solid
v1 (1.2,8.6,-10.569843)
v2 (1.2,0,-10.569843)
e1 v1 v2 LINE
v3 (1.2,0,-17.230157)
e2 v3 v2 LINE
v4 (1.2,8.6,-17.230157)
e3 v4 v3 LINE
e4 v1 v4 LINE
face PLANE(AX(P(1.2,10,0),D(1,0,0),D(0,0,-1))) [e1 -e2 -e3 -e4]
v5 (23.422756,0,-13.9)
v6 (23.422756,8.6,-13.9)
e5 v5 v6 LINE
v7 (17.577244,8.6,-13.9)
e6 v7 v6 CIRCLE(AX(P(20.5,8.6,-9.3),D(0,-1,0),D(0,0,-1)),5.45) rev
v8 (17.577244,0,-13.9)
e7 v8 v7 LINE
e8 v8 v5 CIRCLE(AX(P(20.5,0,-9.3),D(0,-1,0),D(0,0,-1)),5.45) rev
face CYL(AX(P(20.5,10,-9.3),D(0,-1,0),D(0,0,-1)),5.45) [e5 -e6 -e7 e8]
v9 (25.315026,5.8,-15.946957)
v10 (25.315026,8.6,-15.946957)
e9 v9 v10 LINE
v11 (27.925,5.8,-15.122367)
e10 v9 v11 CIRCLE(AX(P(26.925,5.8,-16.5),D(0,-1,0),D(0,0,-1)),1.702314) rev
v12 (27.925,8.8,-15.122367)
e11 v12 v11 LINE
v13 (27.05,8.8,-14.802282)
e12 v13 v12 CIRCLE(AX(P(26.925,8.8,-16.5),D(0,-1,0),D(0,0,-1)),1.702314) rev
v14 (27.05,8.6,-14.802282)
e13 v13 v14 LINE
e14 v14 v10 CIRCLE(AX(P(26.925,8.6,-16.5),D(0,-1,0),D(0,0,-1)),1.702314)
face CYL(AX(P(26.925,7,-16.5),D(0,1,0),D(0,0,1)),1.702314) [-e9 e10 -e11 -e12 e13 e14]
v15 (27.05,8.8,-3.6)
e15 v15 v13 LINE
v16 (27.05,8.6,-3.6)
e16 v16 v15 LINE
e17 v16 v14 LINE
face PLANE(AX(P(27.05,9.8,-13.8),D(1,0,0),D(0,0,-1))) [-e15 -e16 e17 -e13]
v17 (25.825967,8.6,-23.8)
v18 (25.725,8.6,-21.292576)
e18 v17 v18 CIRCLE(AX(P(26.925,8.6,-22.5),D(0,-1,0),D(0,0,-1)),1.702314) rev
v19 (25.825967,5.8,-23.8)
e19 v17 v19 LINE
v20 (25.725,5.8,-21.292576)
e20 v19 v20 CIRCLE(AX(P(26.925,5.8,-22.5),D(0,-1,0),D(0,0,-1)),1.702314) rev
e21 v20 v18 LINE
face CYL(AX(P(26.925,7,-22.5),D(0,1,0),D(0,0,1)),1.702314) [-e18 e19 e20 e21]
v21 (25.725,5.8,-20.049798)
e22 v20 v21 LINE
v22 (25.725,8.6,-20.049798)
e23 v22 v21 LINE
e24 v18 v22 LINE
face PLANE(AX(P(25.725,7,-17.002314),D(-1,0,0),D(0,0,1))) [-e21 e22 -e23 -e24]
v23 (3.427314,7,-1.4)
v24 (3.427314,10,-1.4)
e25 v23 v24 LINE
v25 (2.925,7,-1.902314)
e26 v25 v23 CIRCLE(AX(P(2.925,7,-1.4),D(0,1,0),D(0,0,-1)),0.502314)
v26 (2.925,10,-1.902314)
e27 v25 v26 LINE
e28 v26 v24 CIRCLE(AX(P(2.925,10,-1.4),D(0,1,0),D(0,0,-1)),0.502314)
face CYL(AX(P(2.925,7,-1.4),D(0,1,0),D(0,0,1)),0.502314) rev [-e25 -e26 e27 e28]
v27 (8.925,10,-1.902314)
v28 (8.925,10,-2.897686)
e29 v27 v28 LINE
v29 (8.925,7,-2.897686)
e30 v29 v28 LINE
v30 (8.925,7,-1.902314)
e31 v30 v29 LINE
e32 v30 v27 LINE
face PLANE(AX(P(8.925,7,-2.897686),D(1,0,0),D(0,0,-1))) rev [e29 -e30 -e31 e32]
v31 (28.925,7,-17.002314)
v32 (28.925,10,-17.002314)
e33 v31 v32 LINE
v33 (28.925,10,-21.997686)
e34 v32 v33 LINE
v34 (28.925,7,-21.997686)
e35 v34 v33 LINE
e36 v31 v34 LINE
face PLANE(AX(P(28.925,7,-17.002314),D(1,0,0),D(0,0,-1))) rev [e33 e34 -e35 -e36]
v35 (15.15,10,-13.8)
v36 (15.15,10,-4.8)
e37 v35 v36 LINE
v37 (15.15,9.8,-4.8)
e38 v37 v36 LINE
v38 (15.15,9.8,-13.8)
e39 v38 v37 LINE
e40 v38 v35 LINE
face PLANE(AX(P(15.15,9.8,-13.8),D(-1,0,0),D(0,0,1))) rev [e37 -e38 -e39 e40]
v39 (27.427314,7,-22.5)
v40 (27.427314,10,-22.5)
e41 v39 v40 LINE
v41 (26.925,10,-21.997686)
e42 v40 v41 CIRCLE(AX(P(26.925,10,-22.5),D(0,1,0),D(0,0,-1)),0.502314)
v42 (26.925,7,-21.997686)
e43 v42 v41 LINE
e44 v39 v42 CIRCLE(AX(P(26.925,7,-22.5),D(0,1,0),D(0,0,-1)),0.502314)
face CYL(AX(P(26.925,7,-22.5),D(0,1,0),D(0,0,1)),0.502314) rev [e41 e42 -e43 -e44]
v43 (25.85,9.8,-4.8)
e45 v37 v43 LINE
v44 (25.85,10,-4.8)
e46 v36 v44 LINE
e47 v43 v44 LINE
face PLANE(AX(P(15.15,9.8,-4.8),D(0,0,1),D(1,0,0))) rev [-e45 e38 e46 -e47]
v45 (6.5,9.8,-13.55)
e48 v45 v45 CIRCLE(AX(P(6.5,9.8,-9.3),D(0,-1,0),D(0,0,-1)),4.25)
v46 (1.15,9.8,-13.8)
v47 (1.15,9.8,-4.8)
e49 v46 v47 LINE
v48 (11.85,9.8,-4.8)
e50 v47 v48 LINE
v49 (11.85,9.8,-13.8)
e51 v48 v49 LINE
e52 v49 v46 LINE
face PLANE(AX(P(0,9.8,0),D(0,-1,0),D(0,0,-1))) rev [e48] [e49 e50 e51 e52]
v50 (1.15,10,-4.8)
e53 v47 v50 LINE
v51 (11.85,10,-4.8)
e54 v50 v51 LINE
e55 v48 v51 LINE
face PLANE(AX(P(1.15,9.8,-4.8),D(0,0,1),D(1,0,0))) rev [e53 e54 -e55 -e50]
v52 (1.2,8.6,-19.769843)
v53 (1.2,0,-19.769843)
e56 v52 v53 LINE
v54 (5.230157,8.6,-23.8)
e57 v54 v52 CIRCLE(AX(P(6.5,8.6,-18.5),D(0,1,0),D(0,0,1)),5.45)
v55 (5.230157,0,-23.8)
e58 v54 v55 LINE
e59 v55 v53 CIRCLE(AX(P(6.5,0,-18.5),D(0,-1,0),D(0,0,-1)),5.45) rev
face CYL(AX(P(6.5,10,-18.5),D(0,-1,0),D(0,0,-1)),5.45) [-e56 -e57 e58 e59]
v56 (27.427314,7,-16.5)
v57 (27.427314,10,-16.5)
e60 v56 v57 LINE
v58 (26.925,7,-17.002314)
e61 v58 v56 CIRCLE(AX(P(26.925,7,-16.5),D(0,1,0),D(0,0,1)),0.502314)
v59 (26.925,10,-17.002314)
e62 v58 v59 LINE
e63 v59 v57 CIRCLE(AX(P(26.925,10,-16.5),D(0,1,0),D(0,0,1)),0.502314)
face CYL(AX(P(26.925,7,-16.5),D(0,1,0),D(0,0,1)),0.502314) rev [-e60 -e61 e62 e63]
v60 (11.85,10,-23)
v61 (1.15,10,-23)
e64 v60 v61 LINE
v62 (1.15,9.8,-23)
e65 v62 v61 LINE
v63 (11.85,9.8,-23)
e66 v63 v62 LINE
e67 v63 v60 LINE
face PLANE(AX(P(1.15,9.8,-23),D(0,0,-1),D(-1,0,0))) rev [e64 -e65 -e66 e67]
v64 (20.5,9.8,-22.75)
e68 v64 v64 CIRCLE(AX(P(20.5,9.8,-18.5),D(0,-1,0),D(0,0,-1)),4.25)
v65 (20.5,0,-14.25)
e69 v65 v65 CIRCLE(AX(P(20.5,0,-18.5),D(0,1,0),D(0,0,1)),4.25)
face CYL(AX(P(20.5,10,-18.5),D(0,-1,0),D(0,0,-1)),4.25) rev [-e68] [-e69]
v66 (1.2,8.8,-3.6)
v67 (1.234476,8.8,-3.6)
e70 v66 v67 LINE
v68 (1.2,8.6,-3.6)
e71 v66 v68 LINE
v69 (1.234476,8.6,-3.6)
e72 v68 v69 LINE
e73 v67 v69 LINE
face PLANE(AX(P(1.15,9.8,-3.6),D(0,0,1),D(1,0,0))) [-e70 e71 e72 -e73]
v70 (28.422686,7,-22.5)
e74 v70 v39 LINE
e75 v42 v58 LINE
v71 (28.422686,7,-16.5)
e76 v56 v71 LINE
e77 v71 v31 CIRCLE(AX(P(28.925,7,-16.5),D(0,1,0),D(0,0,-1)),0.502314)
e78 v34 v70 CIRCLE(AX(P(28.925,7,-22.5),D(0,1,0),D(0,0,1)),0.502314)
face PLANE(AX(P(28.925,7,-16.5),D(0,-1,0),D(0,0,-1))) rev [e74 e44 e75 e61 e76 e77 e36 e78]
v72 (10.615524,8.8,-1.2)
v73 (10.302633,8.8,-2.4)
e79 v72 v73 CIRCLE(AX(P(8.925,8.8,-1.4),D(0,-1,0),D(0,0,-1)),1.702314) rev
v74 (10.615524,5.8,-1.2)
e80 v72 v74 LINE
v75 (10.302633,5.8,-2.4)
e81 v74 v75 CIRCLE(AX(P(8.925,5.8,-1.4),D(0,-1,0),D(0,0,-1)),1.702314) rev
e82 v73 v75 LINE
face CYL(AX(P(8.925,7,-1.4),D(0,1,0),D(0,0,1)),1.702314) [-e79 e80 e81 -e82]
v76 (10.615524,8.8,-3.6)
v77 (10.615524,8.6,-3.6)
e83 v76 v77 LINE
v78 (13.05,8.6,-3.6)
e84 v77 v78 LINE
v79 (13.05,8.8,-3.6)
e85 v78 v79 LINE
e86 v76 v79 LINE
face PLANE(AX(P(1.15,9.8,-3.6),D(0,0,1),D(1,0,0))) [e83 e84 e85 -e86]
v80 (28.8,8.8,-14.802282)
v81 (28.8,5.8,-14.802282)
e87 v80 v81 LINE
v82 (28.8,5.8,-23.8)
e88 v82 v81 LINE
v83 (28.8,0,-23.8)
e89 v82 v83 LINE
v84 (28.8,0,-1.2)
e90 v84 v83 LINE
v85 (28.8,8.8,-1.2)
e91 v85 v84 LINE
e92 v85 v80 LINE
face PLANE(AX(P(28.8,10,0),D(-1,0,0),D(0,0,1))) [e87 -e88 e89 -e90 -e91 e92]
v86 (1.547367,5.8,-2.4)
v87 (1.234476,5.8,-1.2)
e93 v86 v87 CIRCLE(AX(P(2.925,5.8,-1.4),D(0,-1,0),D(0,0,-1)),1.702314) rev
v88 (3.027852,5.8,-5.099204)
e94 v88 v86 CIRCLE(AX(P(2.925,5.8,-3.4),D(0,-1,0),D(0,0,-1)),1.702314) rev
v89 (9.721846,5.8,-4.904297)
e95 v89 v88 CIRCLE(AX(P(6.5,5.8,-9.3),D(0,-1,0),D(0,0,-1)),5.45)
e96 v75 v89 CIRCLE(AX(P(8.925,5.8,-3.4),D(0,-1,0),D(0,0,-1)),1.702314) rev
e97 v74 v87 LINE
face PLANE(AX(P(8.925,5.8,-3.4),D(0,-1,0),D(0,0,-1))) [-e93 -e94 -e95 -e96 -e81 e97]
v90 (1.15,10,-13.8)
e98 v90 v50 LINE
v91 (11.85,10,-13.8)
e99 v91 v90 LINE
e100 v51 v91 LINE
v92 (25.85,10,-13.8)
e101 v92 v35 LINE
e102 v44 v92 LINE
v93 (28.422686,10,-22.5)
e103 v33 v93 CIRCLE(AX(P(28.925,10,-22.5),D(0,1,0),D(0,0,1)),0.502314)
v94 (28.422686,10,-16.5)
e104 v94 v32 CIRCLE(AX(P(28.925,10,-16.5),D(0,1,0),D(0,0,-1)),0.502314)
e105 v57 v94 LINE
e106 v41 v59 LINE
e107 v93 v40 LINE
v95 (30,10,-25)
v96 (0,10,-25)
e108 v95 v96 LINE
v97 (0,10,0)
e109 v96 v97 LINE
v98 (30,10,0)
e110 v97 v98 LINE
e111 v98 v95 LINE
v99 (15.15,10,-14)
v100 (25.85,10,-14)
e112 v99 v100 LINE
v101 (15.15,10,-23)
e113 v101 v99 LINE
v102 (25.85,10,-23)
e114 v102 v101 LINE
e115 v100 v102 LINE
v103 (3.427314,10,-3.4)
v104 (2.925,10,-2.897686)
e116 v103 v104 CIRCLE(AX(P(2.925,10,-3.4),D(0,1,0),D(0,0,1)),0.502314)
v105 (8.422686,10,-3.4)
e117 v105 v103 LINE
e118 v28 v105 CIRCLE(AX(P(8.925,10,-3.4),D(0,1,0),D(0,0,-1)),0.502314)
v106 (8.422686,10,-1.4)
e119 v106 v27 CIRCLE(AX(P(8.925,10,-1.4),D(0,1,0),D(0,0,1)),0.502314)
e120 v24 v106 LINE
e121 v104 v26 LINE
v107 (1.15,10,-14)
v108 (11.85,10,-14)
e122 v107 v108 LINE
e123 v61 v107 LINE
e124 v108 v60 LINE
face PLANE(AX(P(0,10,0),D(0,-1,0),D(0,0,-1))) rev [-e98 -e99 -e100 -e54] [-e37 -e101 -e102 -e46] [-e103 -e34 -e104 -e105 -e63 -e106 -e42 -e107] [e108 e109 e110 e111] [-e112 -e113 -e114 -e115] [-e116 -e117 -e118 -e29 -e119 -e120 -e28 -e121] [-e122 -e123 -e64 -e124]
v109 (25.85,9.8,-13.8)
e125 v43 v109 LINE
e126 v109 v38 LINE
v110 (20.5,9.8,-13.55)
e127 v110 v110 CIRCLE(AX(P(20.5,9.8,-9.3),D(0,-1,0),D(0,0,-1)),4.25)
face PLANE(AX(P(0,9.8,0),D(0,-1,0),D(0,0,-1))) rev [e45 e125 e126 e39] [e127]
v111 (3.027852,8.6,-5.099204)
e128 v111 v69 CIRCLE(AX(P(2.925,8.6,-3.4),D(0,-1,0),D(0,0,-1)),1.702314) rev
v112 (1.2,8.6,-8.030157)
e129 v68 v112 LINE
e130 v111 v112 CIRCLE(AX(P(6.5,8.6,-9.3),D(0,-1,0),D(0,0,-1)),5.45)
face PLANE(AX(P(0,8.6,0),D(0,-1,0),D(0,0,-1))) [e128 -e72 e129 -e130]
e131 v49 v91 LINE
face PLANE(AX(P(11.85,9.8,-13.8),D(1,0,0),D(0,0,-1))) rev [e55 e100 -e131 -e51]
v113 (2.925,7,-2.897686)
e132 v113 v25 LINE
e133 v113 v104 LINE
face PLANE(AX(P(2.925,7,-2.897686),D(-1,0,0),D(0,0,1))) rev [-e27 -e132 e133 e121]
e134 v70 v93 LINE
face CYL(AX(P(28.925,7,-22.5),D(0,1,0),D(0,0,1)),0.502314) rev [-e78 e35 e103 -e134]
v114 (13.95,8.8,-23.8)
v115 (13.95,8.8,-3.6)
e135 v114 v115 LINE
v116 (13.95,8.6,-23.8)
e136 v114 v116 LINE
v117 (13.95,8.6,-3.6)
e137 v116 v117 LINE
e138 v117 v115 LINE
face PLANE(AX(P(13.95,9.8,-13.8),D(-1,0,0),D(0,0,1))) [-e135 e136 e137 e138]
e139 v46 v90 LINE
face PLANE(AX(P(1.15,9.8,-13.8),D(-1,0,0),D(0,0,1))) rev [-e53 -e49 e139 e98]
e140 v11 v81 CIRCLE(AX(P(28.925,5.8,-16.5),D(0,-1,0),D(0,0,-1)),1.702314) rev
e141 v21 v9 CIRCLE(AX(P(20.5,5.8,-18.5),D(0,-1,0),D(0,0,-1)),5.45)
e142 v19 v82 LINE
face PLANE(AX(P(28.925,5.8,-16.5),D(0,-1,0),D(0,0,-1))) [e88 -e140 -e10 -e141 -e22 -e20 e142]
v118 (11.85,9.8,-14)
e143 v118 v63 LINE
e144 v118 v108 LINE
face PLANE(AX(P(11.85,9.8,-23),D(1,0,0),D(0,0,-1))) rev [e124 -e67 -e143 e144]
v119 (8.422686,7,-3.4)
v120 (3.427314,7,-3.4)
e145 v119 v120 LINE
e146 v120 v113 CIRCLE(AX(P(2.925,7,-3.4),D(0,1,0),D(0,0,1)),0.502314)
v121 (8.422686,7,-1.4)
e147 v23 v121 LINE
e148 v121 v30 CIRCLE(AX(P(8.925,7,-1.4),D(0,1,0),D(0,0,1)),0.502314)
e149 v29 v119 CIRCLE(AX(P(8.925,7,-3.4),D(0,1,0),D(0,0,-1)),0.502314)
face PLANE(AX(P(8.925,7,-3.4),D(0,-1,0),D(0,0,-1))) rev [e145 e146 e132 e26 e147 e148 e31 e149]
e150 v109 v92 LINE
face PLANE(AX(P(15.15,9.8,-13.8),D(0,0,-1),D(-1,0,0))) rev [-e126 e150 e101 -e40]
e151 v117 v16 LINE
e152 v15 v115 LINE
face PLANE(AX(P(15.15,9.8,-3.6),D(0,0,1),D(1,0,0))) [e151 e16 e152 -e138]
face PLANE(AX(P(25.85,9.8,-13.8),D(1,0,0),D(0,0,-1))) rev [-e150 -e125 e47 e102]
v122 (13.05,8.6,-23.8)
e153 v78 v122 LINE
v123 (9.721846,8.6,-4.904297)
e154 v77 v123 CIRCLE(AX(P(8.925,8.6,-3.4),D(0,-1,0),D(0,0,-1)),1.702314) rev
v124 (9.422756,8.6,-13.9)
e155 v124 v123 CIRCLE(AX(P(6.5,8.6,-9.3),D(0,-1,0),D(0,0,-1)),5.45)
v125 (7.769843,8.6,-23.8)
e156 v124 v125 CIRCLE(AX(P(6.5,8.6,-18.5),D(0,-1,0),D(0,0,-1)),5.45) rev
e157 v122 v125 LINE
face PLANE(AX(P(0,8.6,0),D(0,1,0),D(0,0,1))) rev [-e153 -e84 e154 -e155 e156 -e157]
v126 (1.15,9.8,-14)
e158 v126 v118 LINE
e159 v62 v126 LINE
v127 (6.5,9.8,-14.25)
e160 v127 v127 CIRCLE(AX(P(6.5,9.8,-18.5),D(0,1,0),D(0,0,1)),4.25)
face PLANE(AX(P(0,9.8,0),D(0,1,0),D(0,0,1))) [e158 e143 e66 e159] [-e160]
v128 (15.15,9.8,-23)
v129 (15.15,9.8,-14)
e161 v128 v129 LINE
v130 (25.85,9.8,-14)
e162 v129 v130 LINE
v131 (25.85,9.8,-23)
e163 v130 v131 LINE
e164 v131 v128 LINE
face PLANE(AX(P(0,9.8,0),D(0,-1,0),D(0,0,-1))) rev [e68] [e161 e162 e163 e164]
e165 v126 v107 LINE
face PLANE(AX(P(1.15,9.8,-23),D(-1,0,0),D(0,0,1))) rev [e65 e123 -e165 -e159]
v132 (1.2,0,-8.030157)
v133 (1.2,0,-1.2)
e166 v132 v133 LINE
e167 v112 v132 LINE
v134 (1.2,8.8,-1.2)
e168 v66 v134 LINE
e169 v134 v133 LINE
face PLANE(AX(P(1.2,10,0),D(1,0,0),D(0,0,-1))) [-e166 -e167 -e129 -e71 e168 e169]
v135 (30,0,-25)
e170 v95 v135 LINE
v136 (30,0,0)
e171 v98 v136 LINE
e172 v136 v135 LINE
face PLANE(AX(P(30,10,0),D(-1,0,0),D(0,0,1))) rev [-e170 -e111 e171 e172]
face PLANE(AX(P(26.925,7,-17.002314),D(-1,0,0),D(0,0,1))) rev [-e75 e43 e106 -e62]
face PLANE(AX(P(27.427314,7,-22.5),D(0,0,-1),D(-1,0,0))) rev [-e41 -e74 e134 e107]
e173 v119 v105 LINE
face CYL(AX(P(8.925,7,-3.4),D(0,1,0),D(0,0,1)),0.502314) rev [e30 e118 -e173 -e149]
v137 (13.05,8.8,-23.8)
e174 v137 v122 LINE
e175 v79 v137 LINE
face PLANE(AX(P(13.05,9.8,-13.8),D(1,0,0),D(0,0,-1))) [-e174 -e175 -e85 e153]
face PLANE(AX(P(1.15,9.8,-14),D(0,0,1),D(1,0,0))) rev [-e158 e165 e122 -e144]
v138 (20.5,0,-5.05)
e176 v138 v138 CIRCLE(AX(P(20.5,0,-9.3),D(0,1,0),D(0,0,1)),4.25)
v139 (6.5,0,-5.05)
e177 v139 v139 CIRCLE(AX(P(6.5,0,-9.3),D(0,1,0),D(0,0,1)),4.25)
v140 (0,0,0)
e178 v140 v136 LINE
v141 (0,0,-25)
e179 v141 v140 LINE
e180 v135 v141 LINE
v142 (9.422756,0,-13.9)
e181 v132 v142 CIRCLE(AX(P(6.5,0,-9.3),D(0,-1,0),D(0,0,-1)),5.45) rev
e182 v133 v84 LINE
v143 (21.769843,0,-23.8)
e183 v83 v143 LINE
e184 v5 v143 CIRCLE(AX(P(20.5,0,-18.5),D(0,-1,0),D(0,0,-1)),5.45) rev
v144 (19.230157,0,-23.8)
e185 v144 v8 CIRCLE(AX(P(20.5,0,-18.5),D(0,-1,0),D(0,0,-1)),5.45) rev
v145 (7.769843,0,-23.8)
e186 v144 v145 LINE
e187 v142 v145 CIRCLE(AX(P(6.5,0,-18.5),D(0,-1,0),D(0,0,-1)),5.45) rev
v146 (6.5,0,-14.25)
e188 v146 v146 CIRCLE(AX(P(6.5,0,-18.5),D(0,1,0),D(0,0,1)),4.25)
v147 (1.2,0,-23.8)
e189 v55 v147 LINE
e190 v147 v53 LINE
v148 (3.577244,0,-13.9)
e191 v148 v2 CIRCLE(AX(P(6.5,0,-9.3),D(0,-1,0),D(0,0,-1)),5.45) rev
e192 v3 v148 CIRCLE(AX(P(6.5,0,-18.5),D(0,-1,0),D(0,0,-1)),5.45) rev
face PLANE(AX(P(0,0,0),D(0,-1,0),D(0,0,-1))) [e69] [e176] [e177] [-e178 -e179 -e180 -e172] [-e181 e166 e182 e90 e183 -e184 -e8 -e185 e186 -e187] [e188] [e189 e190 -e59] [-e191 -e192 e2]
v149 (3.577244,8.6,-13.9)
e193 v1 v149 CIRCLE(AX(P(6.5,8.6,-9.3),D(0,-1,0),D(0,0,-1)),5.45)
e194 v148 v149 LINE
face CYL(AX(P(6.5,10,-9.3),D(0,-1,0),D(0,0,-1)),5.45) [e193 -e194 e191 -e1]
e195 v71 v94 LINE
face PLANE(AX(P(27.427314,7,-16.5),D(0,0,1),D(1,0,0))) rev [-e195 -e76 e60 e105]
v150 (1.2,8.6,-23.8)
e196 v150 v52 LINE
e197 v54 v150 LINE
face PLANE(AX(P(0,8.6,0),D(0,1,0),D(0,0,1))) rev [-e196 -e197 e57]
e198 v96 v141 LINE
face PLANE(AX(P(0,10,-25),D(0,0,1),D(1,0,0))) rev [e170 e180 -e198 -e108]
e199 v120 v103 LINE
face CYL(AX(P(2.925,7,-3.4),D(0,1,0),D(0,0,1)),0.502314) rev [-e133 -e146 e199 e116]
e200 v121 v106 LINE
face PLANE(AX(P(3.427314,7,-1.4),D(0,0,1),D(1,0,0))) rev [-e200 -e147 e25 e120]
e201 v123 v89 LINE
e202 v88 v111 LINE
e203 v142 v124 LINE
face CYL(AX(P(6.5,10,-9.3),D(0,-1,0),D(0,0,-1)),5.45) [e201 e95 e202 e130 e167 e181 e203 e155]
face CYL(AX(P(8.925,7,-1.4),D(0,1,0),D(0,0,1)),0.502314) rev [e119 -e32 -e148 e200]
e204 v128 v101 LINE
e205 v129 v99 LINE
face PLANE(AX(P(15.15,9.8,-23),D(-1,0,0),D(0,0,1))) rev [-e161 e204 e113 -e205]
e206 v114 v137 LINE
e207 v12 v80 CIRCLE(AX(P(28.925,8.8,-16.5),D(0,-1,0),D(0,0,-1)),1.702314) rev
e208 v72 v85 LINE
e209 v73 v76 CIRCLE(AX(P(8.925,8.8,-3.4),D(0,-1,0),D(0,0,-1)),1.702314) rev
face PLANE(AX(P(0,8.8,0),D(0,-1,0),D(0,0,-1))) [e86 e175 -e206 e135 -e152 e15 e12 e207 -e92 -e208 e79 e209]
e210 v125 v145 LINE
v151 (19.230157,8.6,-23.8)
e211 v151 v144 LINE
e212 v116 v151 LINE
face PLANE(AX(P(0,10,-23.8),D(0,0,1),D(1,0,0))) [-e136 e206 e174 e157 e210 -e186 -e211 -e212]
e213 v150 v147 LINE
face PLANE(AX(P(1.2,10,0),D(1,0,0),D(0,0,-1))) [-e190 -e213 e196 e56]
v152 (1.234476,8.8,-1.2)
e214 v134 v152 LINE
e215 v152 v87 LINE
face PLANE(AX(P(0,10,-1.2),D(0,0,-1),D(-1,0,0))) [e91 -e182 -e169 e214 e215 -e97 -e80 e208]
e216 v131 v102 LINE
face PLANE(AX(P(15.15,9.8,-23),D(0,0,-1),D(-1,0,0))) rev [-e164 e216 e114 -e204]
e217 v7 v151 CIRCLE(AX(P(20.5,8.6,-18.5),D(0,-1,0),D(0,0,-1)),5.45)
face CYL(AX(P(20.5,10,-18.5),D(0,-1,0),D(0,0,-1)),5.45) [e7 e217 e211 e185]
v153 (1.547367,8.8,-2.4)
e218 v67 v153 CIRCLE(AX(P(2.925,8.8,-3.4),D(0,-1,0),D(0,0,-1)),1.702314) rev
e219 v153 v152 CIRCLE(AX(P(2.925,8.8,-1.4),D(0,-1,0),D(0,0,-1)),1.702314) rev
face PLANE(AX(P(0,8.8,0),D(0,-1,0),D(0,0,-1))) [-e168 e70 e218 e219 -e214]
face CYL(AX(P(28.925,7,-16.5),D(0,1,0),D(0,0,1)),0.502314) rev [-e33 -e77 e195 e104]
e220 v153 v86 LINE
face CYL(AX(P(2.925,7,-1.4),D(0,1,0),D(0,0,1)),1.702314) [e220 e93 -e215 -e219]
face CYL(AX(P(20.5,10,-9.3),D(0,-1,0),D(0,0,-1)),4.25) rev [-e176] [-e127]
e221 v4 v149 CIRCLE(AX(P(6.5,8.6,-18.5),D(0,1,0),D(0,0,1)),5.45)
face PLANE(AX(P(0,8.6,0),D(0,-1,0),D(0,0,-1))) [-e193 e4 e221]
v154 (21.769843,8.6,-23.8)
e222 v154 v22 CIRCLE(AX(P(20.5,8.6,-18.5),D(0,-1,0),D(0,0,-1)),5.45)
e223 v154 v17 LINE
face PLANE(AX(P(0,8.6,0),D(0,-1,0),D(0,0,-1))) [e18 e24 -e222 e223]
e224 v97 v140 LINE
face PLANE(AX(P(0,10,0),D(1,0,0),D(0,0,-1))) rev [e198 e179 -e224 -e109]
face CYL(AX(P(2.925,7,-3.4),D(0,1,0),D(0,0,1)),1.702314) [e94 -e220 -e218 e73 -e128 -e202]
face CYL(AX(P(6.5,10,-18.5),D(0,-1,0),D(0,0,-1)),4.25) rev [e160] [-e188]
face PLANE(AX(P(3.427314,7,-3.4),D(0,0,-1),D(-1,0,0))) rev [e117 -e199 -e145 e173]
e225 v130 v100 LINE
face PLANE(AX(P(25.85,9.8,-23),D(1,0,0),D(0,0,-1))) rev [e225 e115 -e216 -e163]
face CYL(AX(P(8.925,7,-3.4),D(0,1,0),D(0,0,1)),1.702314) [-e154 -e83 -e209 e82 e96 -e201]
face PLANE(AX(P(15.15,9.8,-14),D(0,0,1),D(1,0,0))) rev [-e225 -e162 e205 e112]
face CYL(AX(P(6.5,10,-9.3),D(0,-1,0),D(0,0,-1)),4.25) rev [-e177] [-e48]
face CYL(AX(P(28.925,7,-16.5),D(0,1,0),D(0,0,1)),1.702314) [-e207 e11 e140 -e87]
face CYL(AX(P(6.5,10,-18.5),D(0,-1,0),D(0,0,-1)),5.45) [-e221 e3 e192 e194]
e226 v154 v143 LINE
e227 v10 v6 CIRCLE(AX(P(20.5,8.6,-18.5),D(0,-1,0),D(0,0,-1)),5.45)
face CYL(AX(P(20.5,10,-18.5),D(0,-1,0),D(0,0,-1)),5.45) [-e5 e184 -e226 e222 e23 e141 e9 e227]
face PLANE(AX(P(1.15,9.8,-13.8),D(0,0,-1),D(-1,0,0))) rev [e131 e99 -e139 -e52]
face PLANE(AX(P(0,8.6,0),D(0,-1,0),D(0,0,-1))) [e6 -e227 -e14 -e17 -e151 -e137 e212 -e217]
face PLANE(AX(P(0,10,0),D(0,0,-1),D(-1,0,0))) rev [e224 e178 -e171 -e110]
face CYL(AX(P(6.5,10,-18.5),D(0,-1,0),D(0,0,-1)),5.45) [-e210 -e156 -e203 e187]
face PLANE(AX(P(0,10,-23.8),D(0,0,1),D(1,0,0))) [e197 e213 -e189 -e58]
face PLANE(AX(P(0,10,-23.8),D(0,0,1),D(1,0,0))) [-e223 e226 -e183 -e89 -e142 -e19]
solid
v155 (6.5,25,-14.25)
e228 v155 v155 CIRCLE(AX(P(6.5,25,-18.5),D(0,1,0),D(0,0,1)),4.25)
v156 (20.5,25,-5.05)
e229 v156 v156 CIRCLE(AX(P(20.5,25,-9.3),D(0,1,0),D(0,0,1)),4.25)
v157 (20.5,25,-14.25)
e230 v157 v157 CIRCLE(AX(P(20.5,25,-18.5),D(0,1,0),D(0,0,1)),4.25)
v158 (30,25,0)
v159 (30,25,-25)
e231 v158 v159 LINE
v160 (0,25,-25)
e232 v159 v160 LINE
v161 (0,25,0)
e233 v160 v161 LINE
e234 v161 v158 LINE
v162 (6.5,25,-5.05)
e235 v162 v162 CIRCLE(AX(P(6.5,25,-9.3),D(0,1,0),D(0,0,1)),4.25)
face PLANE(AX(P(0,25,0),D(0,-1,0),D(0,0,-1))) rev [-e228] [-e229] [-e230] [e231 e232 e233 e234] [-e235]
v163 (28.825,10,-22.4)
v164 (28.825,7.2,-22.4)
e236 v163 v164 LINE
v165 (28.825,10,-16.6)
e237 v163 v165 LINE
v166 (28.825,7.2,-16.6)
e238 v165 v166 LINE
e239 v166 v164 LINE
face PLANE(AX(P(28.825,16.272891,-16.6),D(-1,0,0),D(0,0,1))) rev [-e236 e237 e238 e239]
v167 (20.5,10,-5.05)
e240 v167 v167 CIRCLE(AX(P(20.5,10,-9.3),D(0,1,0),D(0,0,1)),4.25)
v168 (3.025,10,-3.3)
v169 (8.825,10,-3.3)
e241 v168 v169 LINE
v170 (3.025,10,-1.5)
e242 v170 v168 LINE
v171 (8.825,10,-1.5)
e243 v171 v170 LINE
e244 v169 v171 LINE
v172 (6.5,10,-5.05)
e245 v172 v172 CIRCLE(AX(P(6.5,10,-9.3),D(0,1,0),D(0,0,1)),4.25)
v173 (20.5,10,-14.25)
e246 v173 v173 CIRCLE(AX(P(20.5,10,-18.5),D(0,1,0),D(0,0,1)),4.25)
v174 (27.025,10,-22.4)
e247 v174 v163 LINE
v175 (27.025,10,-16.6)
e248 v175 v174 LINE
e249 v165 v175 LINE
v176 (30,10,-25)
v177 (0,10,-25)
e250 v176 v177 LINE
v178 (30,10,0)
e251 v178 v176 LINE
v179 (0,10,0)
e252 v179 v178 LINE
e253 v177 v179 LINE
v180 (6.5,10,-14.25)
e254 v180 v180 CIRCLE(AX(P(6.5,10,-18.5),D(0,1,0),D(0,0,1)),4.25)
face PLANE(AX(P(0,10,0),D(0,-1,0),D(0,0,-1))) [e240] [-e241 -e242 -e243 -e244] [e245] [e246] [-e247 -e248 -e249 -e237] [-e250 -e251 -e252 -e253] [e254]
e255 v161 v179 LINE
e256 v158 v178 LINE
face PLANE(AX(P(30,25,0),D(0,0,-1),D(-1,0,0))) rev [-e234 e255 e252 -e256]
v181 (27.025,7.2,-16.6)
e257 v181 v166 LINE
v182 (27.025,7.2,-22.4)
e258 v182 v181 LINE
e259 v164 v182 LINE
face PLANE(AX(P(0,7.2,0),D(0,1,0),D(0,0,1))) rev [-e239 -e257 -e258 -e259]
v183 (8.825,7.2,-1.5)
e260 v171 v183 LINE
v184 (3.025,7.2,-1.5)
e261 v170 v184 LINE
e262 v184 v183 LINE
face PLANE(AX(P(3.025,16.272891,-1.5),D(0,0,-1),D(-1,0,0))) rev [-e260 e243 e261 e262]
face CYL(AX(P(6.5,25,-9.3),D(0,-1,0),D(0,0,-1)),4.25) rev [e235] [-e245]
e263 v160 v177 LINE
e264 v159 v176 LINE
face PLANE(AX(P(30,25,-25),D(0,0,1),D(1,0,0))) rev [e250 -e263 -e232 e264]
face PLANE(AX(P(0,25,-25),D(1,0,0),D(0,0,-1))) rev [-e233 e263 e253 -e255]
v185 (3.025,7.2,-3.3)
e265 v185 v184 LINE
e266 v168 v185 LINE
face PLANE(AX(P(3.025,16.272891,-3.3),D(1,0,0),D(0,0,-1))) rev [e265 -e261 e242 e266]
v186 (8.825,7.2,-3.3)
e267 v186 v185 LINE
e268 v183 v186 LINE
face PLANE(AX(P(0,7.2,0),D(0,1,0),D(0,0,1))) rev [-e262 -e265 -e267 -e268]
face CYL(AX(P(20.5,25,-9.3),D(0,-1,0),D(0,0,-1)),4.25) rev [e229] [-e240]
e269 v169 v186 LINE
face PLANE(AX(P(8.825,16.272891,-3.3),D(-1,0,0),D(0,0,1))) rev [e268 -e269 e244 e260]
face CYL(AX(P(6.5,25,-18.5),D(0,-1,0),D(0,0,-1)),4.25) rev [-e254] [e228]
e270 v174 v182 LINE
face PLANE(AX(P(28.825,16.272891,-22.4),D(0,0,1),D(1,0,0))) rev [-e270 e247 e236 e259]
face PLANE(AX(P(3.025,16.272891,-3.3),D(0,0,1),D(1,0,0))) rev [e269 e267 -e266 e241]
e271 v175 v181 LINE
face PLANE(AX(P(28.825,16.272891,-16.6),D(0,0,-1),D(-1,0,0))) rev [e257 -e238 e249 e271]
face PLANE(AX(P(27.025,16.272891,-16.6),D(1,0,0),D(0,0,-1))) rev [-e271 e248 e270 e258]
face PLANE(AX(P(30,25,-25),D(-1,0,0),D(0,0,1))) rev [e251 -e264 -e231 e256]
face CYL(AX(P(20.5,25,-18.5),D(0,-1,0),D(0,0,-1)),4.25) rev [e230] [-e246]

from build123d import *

# Parameters (mm, degrees)
SKETCH2_W             = 30
SKETCH2_H             = 25
SKETCH2_R             = 4.25
BOSS_EXTRUDE1_DEPTH   = 10
SKETCH4_W             = 10.7
SKETCH4_H             = 9
CUT_EXTRUDE1_DEPTH    = 0.2
CUT_EXTRUDE2_DEPTH    = 3
SKETCH6_W             = 5.8
SKETCH6_H             = 1.8
BOSS_EXTRUDE2_DEPTH   = 2.8
SKETCH6_W_2           = 1.8
SKETCH6_H_2           = 5.8
BOSS_EXTRUDE2_2_DEPTH = 2.8
SKETCH8_W             = 30
SKETCH8_H             = 25
SKETCH8_R             = 4.25
BOSS_EXTRUDE3_DEPTH   = 15
SHELL1_DEPTH          = 8.6
SHELL1_2_DEPTH        = 5.8
SHELL1_START          = 8.6
SHELL1_3_DEPTH        = 0.2


# Read off the part's stored shape, not the designer's step: Shell1
with BuildPart() as part:
    # Sketch2 → Boss-Extrude1 (new body)
    with BuildSketch(Plane(origin=(0, 0, 0), x_dir=(1, 0, 0), z_dir=(0, 1, 0))):
        with Locations((15, 12.5)):
            Rectangle(SKETCH2_W, SKETCH2_H)
        with Locations(Location((6.5, 18.5, 0), (0, 0, 270))):
            Circle(SKETCH2_R, mode=Mode.SUBTRACT)
        with Locations(Location((20.5, 18.5, 0), (0, 0, 270))):
            Circle(SKETCH2_R, mode=Mode.SUBTRACT)
        with Locations(Location((20.5, 9.3, 0), (0, 0, 270))):
            Circle(SKETCH2_R, mode=Mode.SUBTRACT)
        with Locations(Location((6.5, 9.3, 0), (0, 0, 270))):
            Circle(SKETCH2_R, mode=Mode.SUBTRACT)
    extrude(amount=BOSS_EXTRUDE1_DEPTH)

    # Sketch4 → Cut-Extrude1 (cut)
    with BuildSketch(Plane(origin=(0, 10, 0), x_dir=(1, 0, 0), z_dir=(0, 1, 0))):
        with Locations((6.5, 18.5)):
            Rectangle(SKETCH4_W, SKETCH4_H)
        with Locations((20.5, 18.5)):
            Rectangle(SKETCH4_W, SKETCH4_H)
        with Locations((20.5, 9.3)):
            Rectangle(SKETCH4_W, SKETCH4_H)
        with Locations((6.5, 9.3)):
            Rectangle(SKETCH4_W, SKETCH4_H)
    extrude(amount=-CUT_EXTRUDE1_DEPTH, mode=Mode.SUBTRACT)

    # Sketch5 → Cut-Extrude2 (cut)
    with BuildSketch(Plane(origin=(0, 10, 0), x_dir=(1, 0, 0), z_dir=(0, 1, 0))):
        with BuildLine():
            Line((3.427313979, 3.4), (8.422686021, 3.4))
            ThreePointArc((8.422686021, 3.4), (9.280189621, 3.755189621), (8.925, 2.897686021))
            Line((8.925, 2.897686021), (8.925, 1.902313979))
            ThreePointArc((8.925, 1.902313979), (9.280189621, 1.044810379), (8.422686021, 1.4))
            Line((8.422686021, 1.4), (3.427313979, 1.4))
            ThreePointArc((3.427313979, 1.4), (2.569810379, 1.044810379), (2.925, 1.902313979))
            Line((2.925, 1.902313979), (2.925, 2.897686021))
            ThreePointArc((2.925, 2.897686021), (2.569810379, 3.755189621), (3.427313979, 3.4))
        make_face()
        with BuildLine():
            Line((27.427313979, 16.5), (28.422686021, 16.5))
            ThreePointArc((28.422686021, 16.5), (29.280189621, 16.144810379), (28.925, 17.002313979))
            Line((28.925, 17.002313979), (28.925, 21.997686021))
            ThreePointArc((28.925, 21.997686021), (29.280189621, 22.855189621), (28.422686021, 22.5))
            Line((28.422686021, 22.5), (27.427313979, 22.5))
            ThreePointArc((27.427313979, 22.5), (26.569810379, 22.855189621), (26.925, 21.997686021))
            Line((26.925, 21.997686021), (26.925, 17.002313979))
            ThreePointArc((26.925, 17.002313979), (26.569810379, 16.144810379), (27.427313979, 16.5))
        make_face()
    extrude(amount=-CUT_EXTRUDE2_DEPTH, mode=Mode.SUBTRACT)

    # Shell1 outline → Shell1 (cut)
    with BuildSketch(Plane(origin=(0, 0, 0), x_dir=(1, 0, 0), z_dir=(0, 1, 0))):
        with BuildLine():
            Line((1.2, 23.8), (1.2, 19.76984251))
            ThreePointArc((1.2, 19.76984251), (2.646268043, 22.353731957), (5.23015749, 23.8))
            Line((5.23015749, 23.8), (1.2, 23.8))
        make_face()
        with BuildLine():
            ThreePointArc((1.2, 10.56984251), (2.0642459, 12.466478417), (3.577244451, 13.9))
            ThreePointArc((3.577244451, 13.9), (2.0642459, 15.333521583), (1.2, 17.23015749))
            Line((1.2, 17.23015749), (1.2, 10.56984251))
        make_face()
        with BuildLine():
            ThreePointArc((7.76984251, 23.8), (11.875590165, 19.397513442), (9.422755549, 13.9))
            ThreePointArc((9.422755549, 13.9), (11.946990168, 9.481102493), (9.721846281, 4.904296809))
            ThreePointArc((9.721846281, 4.904296809), (10.583302066, 3.784586976), (10.302633073, 2.4))
            ThreePointArc((10.302633073, 2.4), (10.572239397, 1.829505823), (10.615524441, 1.2))
            Line((10.615524441, 1.2), (28.8, 1.2))
            Line((28.8, 1.2), (28.8, 14.802281565))
            ThreePointArc((28.8, 14.802281565), (28.340175317, 14.901296471), (27.925, 15.122366927))
            ThreePointArc((27.925, 15.122366927), (26.412160351, 14.876772235), (25.315025831, 15.946957453))
            ThreePointArc((25.315025831, 15.946957453), (24.501977496, 14.8004492), (23.422755549, 13.9))
            ThreePointArc((23.422755549, 13.9), (20.5, 3.85), (17.577244451, 13.9))
            ThreePointArc((17.577244451, 13.9), (15.124409835, 19.397513442), (19.23015749, 23.8))
            Line((19.23015749, 23.8), (7.76984251, 23.8))
        make_face()
        with BuildLine():
            ThreePointArc((3.027851764, 5.099204049), (1.875579151, 6.416038868), (1.2, 8.03015749))
            Line((1.2, 8.03015749), (1.2, 1.2))
            Line((1.2, 1.2), (1.234475559, 1.2))
            ThreePointArc((1.234475559, 1.2), (1.277760603, 1.829505823), (1.547366927, 2.4))
            ThreePointArc((1.547366927, 2.4), (1.432454366, 4.218645475), (3.027851764, 5.099204049))
        make_face()
        with BuildLine():
            ThreePointArc((21.76984251, 23.8), (24.249899714, 22.454839078), (25.725, 20.049798374))
            Line((25.725, 20.049798374), (25.725, 21.29257593))
            ThreePointArc((25.725, 21.29257593), (25.224064461, 22.568492149), (25.825967296, 23.8))
            Line((25.825967296, 23.8), (21.76984251, 23.8))
        make_face()
    extrude(amount=SHELL1_DEPTH, mode=Mode.SUBTRACT)

    # Shell1 2 outline → Shell1 2 (cut)
    with BuildSketch(Plane(origin=(0, 0, 0), x_dir=(1, 0, 0), z_dir=(0, 1, 0))):
        with BuildLine():
            ThreePointArc((10.302633073, 2.4), (10.583302066, 3.784586976), (9.721846281, 4.904296809))
            ThreePointArc((9.721846281, 4.904296809), (6.341381038, 3.852308744), (3.027851764, 5.099204049))
            ThreePointArc((3.027851764, 5.099204049), (1.432454366, 4.218645475), (1.547366927, 2.4))
            ThreePointArc((1.547366927, 2.4), (1.277760603, 1.829505823), (1.234475559, 1.2))
            Line((1.234475559, 1.2), (10.615524441, 1.2))
            ThreePointArc((10.615524441, 1.2), (10.572239397, 1.829505823), (10.302633073, 2.4))
        make_face()
        with BuildLine():
            ThreePointArc((25.315025831, 15.946957453), (26.412160351, 14.876772235), (27.925, 15.122366927))
            ThreePointArc((27.925, 15.122366927), (28.340175317, 14.901296471), (28.8, 14.802281565))
            Line((28.8, 14.802281565), (28.8, 23.8))
            Line((28.8, 23.8), (25.825967296, 23.8))
            ThreePointArc((25.825967296, 23.8), (25.224064461, 22.568492149), (25.725, 21.29257593))
            Line((25.725, 21.29257593), (25.725, 20.049798374))
            ThreePointArc((25.725, 20.049798374), (25.92299323, 17.958110323), (25.315025831, 15.946957453))
        make_face()
    extrude(amount=SHELL1_2_DEPTH, mode=Mode.SUBTRACT)

    # Shell1 3 outline → Shell1 3 (cut)
    with BuildSketch(Plane(origin=(0, 0, 0), x_dir=(1, 0, 0), z_dir=(0, 1, 0)).offset(SHELL1_START)):
        with BuildLine():
            Line((13.95, 23.8), (13.05, 23.8))
            Line((13.05, 23.8), (13.05, 3.6))
            Line((13.05, 3.6), (10.615524441, 3.6))
            ThreePointArc((10.615524441, 3.6), (10.572239397, 2.970494177), (10.302633073, 2.4))
            ThreePointArc((10.302633073, 2.4), (10.572239397, 1.829505823), (10.615524441, 1.2))
            Line((10.615524441, 1.2), (28.8, 1.2))
            Line((28.8, 1.2), (28.8, 14.802281565))
            ThreePointArc((28.8, 14.802281565), (28.340175317, 14.901296471), (27.925, 15.122366927))
            ThreePointArc((27.925, 15.122366927), (27.509824683, 14.901296471), (27.05, 14.802281565))
            Line((27.05, 14.802281565), (27.05, 3.6))
            Line((27.05, 3.6), (13.95, 3.6))
            Line((13.95, 3.6), (13.95, 23.8))
        make_face()
        with BuildLine():
            ThreePointArc((1.547366927, 2.4), (1.277760603, 2.970494177), (1.23447556, 3.6))
            Line((1.23447556, 3.6), (1.2, 3.6))
            Line((1.2, 3.6), (1.2, 1.2))
            Line((1.2, 1.2), (1.234475559, 1.2))
            ThreePointArc((1.234475559, 1.2), (1.277760603, 1.829505823), (1.547366927, 2.4))
        make_face()
    extrude(amount=SHELL1_3_DEPTH, mode=Mode.SUBTRACT)


with BuildPart() as body_2:
    # Sketch6 → Boss-Extrude2 (new body)
    with BuildSketch(Plane(origin=(0, 7, 0), x_dir=(1, 0, 0), z_dir=(0, 1, 0))):
        with Locations((5.925, 2.4)):
            Rectangle(SKETCH6_W, SKETCH6_H)
    extrude(amount=BOSS_EXTRUDE2_DEPTH)


with BuildPart() as body_3:
    # Sketch6 → Boss-Extrude2 2 (new body)
    with BuildSketch(Plane(origin=(0, 7, 0), x_dir=(1, 0, 0), z_dir=(0, 1, 0))):
        with Locations((27.925, 19.5)):
            Rectangle(SKETCH6_W_2, SKETCH6_H_2)
    extrude(amount=BOSS_EXTRUDE2_2_DEPTH)


with BuildPart() as body_3_1:
    # Body-Move/Copy1: moved
    add(body_3.part.moved(Location((0, 0.2, 0))))



with BuildPart() as body_2_1:
    # Body-Move/Copy1: moved
    add(body_2.part.moved(Location((0, 0.2, 0))))


with BuildPart() as body_3_2:
    add(body_3_1.part)

    add(body_2_1.part)  # Boss-Extrude3 merges body 2
    # Sketch8 → Boss-Extrude3 (add)
    with BuildSketch(Plane(origin=(0, 10, 0), x_dir=(1, 0, 0), z_dir=(0, 1, 0))):
        with Locations((15, 12.5)):
            Rectangle(SKETCH8_W, SKETCH8_H)
        with Locations(Location((20.5, 9.3, 0), (0, 0, 270))):
            Circle(SKETCH8_R, mode=Mode.SUBTRACT)
        with Locations(Location((6.5, 9.3, 0), (0, 0, 270))):
            Circle(SKETCH8_R, mode=Mode.SUBTRACT)
        with Locations(Location((20.5, 18.5, 0), (0, 0, 270))):
            Circle(SKETCH8_R, mode=Mode.SUBTRACT)
        with Locations(Location((6.5, 18.5, 0), (0, 0, 270))):
            Circle(SKETCH8_R, mode=Mode.SUBTRACT)
    extrude(amount=BOSS_EXTRUDE3_DEPTH)


solid = Compound([part.part, body_3_2.part])
